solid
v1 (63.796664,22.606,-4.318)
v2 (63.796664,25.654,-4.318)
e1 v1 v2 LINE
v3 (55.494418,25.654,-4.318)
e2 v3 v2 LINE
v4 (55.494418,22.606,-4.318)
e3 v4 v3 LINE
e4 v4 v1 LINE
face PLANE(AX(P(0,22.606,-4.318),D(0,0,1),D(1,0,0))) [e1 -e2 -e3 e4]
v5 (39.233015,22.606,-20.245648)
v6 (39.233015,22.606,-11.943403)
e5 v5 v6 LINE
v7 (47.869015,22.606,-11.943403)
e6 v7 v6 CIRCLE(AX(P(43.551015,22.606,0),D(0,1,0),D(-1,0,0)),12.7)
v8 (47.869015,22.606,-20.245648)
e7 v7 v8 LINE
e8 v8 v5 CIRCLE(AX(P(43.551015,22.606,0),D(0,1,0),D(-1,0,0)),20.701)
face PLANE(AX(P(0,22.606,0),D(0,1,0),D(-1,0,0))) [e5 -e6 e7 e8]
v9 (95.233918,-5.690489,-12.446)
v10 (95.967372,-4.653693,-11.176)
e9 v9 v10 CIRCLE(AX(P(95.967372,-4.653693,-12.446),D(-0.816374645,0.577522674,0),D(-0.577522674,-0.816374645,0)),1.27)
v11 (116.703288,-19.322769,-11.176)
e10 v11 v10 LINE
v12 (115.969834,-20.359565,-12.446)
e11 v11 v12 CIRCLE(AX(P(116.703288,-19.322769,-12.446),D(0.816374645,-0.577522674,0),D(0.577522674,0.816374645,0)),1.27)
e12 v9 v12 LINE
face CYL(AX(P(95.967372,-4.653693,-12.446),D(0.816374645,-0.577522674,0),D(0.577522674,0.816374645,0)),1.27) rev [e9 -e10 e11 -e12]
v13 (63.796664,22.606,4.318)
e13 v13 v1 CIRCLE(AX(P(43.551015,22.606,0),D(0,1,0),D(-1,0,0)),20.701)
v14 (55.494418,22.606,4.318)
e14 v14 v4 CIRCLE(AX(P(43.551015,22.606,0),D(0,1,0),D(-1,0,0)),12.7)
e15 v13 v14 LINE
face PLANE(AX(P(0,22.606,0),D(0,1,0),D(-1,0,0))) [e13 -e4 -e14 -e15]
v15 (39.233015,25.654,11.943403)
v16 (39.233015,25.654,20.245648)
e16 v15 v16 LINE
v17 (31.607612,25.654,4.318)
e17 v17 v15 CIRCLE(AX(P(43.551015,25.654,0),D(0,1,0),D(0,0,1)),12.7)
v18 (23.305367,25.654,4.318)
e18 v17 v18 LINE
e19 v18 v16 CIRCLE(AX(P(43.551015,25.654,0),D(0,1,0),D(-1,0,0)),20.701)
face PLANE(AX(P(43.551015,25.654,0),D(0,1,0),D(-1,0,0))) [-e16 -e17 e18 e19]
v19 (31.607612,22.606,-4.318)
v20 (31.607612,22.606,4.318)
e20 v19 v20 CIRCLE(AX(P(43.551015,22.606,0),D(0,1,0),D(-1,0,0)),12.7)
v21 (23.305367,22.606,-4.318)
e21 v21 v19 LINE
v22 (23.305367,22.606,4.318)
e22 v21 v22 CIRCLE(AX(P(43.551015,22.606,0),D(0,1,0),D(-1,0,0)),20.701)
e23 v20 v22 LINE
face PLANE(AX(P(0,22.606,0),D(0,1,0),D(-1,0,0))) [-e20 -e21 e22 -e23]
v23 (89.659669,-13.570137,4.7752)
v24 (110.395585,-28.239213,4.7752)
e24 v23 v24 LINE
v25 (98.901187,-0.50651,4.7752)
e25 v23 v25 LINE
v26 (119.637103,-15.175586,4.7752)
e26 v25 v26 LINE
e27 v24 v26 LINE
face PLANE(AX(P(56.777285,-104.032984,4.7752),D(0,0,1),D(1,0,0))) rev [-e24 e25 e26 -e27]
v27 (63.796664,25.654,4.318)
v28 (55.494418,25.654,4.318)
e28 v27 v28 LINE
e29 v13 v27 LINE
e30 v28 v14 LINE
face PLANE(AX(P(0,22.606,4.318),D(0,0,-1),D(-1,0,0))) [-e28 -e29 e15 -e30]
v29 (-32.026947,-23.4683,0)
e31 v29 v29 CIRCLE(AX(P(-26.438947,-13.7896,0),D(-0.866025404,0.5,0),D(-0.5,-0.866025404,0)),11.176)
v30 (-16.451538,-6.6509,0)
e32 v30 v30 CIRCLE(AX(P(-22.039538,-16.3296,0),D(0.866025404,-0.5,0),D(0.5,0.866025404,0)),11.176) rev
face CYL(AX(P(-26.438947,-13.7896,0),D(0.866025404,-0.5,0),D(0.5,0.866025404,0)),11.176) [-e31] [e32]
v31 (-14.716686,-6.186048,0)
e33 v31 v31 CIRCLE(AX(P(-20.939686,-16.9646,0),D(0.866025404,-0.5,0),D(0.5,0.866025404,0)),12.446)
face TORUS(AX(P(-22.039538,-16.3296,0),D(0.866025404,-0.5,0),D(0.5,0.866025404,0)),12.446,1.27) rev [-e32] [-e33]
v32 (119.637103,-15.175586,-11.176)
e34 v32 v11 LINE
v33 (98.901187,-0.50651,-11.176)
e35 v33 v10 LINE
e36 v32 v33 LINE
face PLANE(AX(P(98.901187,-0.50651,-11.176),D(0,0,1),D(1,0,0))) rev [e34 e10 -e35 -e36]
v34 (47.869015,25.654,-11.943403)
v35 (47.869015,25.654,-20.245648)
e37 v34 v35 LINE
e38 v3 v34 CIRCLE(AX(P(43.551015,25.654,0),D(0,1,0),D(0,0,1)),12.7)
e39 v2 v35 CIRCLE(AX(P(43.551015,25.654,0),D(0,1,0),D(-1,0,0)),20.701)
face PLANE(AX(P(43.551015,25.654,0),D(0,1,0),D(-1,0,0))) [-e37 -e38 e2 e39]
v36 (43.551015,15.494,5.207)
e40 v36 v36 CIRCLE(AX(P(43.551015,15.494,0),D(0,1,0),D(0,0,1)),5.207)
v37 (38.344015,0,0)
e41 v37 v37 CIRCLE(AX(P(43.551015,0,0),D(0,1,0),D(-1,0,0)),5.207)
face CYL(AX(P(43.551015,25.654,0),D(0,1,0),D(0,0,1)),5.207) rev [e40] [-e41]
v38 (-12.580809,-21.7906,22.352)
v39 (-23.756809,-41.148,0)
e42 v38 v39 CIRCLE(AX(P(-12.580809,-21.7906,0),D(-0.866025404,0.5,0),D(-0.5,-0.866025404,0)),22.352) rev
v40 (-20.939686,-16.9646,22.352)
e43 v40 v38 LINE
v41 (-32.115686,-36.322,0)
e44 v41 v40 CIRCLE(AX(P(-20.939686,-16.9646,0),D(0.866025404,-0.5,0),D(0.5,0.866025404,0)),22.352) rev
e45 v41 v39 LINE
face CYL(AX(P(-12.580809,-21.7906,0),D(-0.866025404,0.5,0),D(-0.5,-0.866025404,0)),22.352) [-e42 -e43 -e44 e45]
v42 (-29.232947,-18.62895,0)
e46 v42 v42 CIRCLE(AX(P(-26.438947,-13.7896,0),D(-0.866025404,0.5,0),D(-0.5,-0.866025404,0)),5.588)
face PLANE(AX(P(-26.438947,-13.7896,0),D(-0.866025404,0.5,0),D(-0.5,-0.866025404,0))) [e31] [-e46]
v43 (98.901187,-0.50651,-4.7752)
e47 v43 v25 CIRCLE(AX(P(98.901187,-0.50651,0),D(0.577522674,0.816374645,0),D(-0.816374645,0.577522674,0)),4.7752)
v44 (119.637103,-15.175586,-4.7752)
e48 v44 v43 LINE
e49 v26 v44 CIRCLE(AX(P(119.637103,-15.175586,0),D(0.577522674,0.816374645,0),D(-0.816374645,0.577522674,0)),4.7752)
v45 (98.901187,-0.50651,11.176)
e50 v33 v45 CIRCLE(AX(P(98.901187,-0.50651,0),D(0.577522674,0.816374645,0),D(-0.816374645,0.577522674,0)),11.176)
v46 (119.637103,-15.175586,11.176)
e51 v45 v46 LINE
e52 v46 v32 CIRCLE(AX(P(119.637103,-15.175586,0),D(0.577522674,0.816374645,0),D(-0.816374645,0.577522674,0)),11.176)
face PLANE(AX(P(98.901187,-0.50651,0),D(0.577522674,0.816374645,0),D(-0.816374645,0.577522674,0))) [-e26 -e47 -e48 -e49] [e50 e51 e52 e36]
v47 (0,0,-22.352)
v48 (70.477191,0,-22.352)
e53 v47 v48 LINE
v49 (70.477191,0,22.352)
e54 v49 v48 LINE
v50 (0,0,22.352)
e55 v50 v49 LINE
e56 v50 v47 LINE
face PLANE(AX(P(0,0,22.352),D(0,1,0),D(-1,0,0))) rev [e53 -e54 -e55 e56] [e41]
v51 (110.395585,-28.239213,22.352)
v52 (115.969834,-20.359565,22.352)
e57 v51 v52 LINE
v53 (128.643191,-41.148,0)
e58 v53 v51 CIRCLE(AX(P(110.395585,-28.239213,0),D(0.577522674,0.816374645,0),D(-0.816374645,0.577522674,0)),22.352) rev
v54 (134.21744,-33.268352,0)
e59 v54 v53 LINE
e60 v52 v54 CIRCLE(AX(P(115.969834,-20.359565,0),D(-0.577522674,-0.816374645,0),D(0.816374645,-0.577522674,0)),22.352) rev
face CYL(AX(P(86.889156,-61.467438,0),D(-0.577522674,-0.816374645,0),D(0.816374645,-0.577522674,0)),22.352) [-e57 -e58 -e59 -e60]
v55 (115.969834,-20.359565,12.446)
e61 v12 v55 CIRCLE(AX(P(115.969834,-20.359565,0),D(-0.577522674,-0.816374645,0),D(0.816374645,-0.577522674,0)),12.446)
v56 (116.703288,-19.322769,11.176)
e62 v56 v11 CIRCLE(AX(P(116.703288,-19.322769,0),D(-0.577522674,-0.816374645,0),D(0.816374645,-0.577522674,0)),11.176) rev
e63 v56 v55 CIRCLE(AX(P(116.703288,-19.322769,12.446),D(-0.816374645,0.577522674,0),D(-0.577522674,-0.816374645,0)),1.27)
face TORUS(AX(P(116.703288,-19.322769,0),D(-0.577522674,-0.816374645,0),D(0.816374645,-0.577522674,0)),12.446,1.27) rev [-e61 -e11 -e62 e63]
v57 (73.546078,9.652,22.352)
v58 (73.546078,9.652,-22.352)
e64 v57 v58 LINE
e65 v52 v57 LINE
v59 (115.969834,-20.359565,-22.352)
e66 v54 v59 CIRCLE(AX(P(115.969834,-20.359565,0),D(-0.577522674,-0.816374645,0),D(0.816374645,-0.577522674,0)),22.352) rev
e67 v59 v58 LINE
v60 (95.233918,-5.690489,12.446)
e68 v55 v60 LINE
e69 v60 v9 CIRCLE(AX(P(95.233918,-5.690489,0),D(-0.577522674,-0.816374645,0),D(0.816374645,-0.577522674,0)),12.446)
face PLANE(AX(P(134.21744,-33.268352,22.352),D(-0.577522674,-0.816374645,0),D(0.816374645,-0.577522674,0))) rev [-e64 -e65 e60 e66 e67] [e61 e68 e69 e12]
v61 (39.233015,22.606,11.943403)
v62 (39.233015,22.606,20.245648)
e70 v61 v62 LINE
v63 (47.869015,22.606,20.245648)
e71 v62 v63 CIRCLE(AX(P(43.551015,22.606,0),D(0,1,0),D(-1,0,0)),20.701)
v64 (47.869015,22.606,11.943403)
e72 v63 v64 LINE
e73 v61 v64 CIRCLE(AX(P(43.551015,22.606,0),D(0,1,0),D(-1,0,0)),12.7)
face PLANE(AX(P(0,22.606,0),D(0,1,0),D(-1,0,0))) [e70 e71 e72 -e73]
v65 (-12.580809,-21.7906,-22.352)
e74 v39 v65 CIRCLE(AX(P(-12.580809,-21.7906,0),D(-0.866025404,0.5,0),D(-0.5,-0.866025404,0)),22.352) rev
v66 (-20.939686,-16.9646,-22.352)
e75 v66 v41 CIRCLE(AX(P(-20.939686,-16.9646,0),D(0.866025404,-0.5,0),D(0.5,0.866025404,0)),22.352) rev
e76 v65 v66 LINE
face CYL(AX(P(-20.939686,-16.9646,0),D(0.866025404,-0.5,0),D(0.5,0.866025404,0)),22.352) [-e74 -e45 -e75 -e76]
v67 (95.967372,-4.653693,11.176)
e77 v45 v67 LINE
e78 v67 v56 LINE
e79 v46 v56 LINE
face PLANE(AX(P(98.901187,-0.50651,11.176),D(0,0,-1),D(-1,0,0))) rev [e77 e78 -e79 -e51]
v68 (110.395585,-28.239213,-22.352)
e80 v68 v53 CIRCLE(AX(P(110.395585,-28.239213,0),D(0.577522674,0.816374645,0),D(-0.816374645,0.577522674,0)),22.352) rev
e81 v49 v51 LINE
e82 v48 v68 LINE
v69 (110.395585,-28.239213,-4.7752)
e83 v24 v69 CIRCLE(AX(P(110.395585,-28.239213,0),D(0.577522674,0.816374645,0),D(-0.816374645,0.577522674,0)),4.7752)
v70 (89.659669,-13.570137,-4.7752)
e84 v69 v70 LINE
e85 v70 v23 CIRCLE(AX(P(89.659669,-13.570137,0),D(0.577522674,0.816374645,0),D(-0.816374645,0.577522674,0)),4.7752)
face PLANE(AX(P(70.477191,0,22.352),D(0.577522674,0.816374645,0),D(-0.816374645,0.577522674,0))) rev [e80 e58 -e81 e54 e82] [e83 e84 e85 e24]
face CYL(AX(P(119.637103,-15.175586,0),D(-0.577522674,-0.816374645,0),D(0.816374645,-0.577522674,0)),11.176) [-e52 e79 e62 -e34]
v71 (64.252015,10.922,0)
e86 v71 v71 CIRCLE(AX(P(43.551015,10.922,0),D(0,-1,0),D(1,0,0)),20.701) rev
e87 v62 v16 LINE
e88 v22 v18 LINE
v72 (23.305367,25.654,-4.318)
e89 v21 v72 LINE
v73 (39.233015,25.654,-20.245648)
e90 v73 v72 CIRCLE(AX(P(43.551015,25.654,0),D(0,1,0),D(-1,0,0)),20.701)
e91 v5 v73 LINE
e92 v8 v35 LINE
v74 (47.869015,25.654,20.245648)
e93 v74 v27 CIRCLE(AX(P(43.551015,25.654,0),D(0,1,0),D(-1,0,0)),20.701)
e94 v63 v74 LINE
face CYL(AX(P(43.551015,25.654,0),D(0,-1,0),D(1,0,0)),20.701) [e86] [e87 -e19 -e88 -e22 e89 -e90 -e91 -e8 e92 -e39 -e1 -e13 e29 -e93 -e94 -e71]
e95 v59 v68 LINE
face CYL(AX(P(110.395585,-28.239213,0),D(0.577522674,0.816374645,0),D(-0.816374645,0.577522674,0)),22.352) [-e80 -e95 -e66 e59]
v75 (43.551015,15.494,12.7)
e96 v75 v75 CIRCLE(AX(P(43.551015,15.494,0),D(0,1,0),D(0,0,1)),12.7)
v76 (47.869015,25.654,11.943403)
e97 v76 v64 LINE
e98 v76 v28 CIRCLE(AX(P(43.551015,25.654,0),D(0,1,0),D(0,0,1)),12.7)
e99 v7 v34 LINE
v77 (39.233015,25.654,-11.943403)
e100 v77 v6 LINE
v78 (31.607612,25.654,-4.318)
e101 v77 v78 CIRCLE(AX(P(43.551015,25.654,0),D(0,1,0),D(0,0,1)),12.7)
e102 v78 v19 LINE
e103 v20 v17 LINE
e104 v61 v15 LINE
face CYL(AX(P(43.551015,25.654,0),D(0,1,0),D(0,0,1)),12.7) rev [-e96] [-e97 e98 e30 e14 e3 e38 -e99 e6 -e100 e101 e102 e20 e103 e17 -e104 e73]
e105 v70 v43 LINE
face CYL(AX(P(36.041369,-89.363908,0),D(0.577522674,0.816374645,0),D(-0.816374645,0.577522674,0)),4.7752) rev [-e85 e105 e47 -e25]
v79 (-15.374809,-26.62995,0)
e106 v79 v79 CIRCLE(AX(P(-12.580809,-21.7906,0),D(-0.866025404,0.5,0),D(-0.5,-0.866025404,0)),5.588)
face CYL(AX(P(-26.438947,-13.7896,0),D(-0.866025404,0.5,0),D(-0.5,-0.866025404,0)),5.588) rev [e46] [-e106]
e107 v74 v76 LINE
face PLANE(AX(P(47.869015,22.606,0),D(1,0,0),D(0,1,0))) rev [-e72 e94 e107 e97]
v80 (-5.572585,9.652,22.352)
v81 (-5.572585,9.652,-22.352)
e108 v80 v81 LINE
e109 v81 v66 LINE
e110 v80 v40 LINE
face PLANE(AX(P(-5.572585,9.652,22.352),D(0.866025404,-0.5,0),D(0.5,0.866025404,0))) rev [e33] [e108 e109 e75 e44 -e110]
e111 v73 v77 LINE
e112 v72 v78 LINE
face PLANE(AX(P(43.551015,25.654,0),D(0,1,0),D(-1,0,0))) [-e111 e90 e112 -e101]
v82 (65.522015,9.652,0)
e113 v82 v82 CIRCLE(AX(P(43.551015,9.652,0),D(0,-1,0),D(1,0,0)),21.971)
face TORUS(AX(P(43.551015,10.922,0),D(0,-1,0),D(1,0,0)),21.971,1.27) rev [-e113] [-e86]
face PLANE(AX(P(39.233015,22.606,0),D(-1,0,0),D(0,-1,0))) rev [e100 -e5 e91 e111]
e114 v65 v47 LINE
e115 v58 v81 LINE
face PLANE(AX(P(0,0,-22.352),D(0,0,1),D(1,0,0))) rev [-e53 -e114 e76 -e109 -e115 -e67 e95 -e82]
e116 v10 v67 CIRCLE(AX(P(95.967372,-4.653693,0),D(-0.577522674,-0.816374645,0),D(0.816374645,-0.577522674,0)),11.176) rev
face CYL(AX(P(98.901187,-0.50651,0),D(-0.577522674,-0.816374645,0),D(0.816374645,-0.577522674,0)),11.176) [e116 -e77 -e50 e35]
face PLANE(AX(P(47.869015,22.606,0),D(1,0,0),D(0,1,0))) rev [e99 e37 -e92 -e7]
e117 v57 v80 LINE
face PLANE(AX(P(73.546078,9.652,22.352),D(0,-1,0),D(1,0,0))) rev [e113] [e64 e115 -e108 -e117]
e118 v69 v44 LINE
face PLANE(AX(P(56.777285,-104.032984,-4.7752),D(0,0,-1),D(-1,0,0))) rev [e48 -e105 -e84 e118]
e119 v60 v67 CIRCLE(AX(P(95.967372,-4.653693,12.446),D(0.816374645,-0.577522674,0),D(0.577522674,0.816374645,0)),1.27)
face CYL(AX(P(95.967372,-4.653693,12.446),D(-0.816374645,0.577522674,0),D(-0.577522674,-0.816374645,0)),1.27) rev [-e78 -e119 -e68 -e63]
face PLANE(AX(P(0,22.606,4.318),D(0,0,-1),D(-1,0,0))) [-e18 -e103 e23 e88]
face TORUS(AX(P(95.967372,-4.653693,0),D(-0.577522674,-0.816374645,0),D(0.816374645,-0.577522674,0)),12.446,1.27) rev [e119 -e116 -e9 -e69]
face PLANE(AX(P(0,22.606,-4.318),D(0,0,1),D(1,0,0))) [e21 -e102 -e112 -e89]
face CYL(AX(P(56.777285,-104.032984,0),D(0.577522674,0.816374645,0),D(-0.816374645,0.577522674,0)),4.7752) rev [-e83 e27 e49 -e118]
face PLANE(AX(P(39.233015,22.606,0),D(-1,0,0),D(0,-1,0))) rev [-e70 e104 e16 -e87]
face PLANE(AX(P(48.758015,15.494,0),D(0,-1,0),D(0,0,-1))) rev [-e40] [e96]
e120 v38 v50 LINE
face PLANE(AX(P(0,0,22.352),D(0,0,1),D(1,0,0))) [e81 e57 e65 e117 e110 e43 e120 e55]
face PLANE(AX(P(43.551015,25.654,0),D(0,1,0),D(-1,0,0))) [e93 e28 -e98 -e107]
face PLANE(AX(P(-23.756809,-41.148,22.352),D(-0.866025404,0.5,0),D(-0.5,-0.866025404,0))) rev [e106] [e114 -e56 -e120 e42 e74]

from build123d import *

# Parameters (mm, degrees)
BOSS_EXTRUDE1_DEPTH                                  = 22.352
FILLET1_R                                            = 22.352
CUT_EXTRUDE1_DEPTH                                   = 136.349100872
BOSS_EXTRUDE2_START                                  = 6.35
BOSS_EXTRUDE2_DEPTH                                  = 6.35
SKETCH4_R                                            = 11.176
BOSS_EXTRUDE3_DEPTH                                  = 6.35
F_3_8_0_44_DIAMETER_HOLE1_D                          = 11.176
SKETCH7_R                                            = 20.701
BOSS_EXTRUDE4_DEPTH                                  = 16.002
CUT_EXTRUDE2_START                                   = -3.048
SKETCH8_W                                            = 8.636
SKETCH8_H                                            = 8.636
CUT_EXTRUDE2_DEPTH                                   = 3.048
CBORE_FOR_3_8_BINDING_HEAD_MACHINE_SCREW_D           = 10.414
CBORE_FOR_3_8_BINDING_HEAD_MACHINE_SCREW_CBORE_D     = 25.4
CBORE_FOR_3_8_BINDING_HEAD_MACHINE_SCREW_CBORE_DEPTH = 10.16
FILLET2_R                                            = 1.27


with BuildPart() as part:
    # Sketch1 → Boss-Extrude1 (new, symmetric)
    with BuildSketch(Plane.XY):
        Polygon((-23.756808877, -41.148), (0, 0), (70.477191123, 0), (128.643191123, -41.148), (134.217439977, -33.268351929), (73.546078299, 9.652), (-5.572584798, 9.652), (-32.115686074, -36.322), align=None)
    extrude(amount=BOSS_EXTRUDE1_DEPTH, both=True)

    # Fillet1
    fillet1_edges = [part.edges().sort_by_distance(p)[0] for p in [
        (-27.936247475, -38.735, 22.352),
        (-27.936247475, -38.735, -22.352),
        (131.43031555, -37.208175965, -22.352),
        (131.43031555, -37.208175965, 22.352),
    ]]
    fillet(fillet1_edges, radius=FILLET1_R - 0.0001)  # a hair under: the kernel refuses the full size

    # Sketch2 → Cut-Extrude1 (cut, through all)
    with BuildSketch(Plane(origin=(29.080678336, 41.107872463, 0), x_dir=(0.8163746447104718, -0.5775226744240014, 0), z_dir=(0.5775226744240014, 0.8163746447104718, 0))):
        with BuildLine():
            Line((106.432942455, -4.7752), (81.032942455, -4.7752))
            ThreePointArc((81.032942455, -4.7752), (76.257742455, 0), (81.032942455, 4.7752))
            Line((81.032942455, 4.7752), (106.432942455, 4.7752))
            ThreePointArc((106.432942455, 4.7752), (111.208142455, 0), (106.432942455, -4.7752))
        make_face()
    extrude(amount=-CUT_EXTRUDE1_DEPTH, mode=Mode.SUBTRACT)

    # Sketch3 → Boss-Extrude2 (add)
    with BuildSketch(Plane(origin=(29.080678336, 41.107872463, 0), x_dir=(0.8163746447104718, -0.5775226744240014, 0), z_dir=(0.5775226744240014, 0.8163746447104718, 0)).offset(BOSS_EXTRUDE2_START)):
        with BuildLine():
            Line((81.032942455, 11.176), (106.432942455, 11.176))
            ThreePointArc((106.432942455, 11.176), (117.608942455, 0), (106.432942455, -11.176))
            Line((106.432942455, -11.176), (81.032942455, -11.176))
            ThreePointArc((81.032942455, -11.176), (69.856942455, 0), (81.032942455, 11.176))
        make_face()
        with BuildLine():
            Line((81.032942455, 4.7752), (106.432942455, 4.7752))
            ThreePointArc((106.432942455, 4.7752), (111.208142455, 0), (106.432942455, -4.7752))
            Line((106.432942455, -4.7752), (81.032942455, -4.7752))
            ThreePointArc((81.032942455, -4.7752), (76.257742455, 0), (81.032942455, 4.7752))
        make_face(mode=Mode.SUBTRACT)
    extrude(amount=-BOSS_EXTRUDE2_DEPTH)

    # Sketch4 → Boss-Extrude3 (add)
    with BuildSketch(Plane(origin=(-8.358877197, 4.826, 0), x_dir=(0, 0, 1), z_dir=(-0.8660254037844402, 0.4999999999999977, 0))):
        with Locations(Location((0, -25.161617753, 0), (0, 0, 90))):
            Circle(SKETCH4_R)
    extrude(amount=BOSS_EXTRUDE3_DEPTH)

    # 3/8 (0.44) Diameter Hole1 (through all)
    with Locations(Plane(origin=(-13.858138511, 8.001, 0), x_dir=(0, 0, 1), z_dir=(-0.86602540378444, 0.49999999999999784, 0))):
        with Locations((0, -25.161617753)):
            Hole(F_3_8_0_44_DIAMETER_HOLE1_D / 2)

    # Sketch7 → Boss-Extrude4 (add)
    with BuildSketch(Plane(origin=(0, 9.652, 0), x_dir=(1, 0, 0), z_dir=(0, 1, 0))):
        with Locations(Location((43.551015202, 0, 0), (0, 0, 180))):
            Circle(SKETCH7_R)
    extrude(amount=BOSS_EXTRUDE4_DEPTH)

    # Sketch8 → Cut-Extrude2 (cut)
    with BuildSketch(Plane(origin=(0, 25.654, 0), x_dir=(1, 0, 0), z_dir=(0, 1, 0)).offset(CUT_EXTRUDE2_START)):
        with BuildLine():
            Line((39.233015202, 20.245648347), (39.233015202, 4.318))
            Line((39.233015202, 4.318), (47.869015202, 4.318))
            Line((47.869015202, 4.318), (47.869015202, 20.245648347))
            ThreePointArc((47.869015202, 20.245648347), (43.551015202, 20.701), (39.233015202, 20.245648347))
        make_face()
        with Locations((43.551015202, 0)):
            Rectangle(SKETCH8_W, SKETCH8_H)
        with BuildLine():
            Line((63.796663549, 4.318), (47.869015202, 4.318))
            Line((47.869015202, 4.318), (47.869015202, -4.318))
            Line((47.869015202, -4.318), (63.796663549, -4.318))
            ThreePointArc((63.796663549, -4.318), (64.137862549, -2.170971506), (64.252015202, 0))
            ThreePointArc((64.252015202, 0), (64.137862549, 2.170971506), (63.796663549, 4.318))
        make_face()
        with BuildLine():
            Line((47.869015202, -4.318), (39.233015202, -4.318))
            Line((39.233015202, -4.318), (39.233015202, -20.245648347))
            ThreePointArc((39.233015202, -20.245648347), (43.551015202, -20.701), (47.869015202, -20.245648347))
            Line((47.869015202, -20.245648347), (47.869015202, -4.318))
        make_face()
        with BuildLine():
            Line((39.233015202, 4.318), (23.305366855, 4.318))
            ThreePointArc((23.305366855, 4.318), (22.850015202, 0), (23.305366855, -4.318))
            Line((23.305366855, -4.318), (39.233015202, -4.318))
            Line((39.233015202, -4.318), (39.233015202, 4.318))
        make_face()
    extrude(amount=CUT_EXTRUDE2_DEPTH, mode=Mode.SUBTRACT)

    # CBORE for 3/8 Binding Head Machine Screw1 (through all)
    with Locations(Plane(origin=(0, 25.654, 0), x_dir=(1, 0, 0), z_dir=(0, 1, 0))):
        with Locations((43.551015202, 0)):
            CounterBoreHole(CBORE_FOR_3_8_BINDING_HEAD_MACHINE_SCREW_D / 2, CBORE_FOR_3_8_BINDING_HEAD_MACHINE_SCREW_CBORE_D / 2, CBORE_FOR_3_8_BINDING_HEAD_MACHINE_SCREW_CBORE_DEPTH)

    # Fillet2
    fillet2_edges = [part.edges().sort_by_distance(p)[0] for p in [
        (86.110114913, 0.763904229, 0),
        (105.601875931, -13.025027145, 11.176),
        (125.093636948, -26.81395852, 0),
        (105.601875931, -13.025027145, -11.176),
        (-26.527686074, -26.643300087, 0),
        (64.252015202, 9.652, 0),
    ]]
    fillet(fillet2_edges, radius=FILLET2_R)


solid = part.part
